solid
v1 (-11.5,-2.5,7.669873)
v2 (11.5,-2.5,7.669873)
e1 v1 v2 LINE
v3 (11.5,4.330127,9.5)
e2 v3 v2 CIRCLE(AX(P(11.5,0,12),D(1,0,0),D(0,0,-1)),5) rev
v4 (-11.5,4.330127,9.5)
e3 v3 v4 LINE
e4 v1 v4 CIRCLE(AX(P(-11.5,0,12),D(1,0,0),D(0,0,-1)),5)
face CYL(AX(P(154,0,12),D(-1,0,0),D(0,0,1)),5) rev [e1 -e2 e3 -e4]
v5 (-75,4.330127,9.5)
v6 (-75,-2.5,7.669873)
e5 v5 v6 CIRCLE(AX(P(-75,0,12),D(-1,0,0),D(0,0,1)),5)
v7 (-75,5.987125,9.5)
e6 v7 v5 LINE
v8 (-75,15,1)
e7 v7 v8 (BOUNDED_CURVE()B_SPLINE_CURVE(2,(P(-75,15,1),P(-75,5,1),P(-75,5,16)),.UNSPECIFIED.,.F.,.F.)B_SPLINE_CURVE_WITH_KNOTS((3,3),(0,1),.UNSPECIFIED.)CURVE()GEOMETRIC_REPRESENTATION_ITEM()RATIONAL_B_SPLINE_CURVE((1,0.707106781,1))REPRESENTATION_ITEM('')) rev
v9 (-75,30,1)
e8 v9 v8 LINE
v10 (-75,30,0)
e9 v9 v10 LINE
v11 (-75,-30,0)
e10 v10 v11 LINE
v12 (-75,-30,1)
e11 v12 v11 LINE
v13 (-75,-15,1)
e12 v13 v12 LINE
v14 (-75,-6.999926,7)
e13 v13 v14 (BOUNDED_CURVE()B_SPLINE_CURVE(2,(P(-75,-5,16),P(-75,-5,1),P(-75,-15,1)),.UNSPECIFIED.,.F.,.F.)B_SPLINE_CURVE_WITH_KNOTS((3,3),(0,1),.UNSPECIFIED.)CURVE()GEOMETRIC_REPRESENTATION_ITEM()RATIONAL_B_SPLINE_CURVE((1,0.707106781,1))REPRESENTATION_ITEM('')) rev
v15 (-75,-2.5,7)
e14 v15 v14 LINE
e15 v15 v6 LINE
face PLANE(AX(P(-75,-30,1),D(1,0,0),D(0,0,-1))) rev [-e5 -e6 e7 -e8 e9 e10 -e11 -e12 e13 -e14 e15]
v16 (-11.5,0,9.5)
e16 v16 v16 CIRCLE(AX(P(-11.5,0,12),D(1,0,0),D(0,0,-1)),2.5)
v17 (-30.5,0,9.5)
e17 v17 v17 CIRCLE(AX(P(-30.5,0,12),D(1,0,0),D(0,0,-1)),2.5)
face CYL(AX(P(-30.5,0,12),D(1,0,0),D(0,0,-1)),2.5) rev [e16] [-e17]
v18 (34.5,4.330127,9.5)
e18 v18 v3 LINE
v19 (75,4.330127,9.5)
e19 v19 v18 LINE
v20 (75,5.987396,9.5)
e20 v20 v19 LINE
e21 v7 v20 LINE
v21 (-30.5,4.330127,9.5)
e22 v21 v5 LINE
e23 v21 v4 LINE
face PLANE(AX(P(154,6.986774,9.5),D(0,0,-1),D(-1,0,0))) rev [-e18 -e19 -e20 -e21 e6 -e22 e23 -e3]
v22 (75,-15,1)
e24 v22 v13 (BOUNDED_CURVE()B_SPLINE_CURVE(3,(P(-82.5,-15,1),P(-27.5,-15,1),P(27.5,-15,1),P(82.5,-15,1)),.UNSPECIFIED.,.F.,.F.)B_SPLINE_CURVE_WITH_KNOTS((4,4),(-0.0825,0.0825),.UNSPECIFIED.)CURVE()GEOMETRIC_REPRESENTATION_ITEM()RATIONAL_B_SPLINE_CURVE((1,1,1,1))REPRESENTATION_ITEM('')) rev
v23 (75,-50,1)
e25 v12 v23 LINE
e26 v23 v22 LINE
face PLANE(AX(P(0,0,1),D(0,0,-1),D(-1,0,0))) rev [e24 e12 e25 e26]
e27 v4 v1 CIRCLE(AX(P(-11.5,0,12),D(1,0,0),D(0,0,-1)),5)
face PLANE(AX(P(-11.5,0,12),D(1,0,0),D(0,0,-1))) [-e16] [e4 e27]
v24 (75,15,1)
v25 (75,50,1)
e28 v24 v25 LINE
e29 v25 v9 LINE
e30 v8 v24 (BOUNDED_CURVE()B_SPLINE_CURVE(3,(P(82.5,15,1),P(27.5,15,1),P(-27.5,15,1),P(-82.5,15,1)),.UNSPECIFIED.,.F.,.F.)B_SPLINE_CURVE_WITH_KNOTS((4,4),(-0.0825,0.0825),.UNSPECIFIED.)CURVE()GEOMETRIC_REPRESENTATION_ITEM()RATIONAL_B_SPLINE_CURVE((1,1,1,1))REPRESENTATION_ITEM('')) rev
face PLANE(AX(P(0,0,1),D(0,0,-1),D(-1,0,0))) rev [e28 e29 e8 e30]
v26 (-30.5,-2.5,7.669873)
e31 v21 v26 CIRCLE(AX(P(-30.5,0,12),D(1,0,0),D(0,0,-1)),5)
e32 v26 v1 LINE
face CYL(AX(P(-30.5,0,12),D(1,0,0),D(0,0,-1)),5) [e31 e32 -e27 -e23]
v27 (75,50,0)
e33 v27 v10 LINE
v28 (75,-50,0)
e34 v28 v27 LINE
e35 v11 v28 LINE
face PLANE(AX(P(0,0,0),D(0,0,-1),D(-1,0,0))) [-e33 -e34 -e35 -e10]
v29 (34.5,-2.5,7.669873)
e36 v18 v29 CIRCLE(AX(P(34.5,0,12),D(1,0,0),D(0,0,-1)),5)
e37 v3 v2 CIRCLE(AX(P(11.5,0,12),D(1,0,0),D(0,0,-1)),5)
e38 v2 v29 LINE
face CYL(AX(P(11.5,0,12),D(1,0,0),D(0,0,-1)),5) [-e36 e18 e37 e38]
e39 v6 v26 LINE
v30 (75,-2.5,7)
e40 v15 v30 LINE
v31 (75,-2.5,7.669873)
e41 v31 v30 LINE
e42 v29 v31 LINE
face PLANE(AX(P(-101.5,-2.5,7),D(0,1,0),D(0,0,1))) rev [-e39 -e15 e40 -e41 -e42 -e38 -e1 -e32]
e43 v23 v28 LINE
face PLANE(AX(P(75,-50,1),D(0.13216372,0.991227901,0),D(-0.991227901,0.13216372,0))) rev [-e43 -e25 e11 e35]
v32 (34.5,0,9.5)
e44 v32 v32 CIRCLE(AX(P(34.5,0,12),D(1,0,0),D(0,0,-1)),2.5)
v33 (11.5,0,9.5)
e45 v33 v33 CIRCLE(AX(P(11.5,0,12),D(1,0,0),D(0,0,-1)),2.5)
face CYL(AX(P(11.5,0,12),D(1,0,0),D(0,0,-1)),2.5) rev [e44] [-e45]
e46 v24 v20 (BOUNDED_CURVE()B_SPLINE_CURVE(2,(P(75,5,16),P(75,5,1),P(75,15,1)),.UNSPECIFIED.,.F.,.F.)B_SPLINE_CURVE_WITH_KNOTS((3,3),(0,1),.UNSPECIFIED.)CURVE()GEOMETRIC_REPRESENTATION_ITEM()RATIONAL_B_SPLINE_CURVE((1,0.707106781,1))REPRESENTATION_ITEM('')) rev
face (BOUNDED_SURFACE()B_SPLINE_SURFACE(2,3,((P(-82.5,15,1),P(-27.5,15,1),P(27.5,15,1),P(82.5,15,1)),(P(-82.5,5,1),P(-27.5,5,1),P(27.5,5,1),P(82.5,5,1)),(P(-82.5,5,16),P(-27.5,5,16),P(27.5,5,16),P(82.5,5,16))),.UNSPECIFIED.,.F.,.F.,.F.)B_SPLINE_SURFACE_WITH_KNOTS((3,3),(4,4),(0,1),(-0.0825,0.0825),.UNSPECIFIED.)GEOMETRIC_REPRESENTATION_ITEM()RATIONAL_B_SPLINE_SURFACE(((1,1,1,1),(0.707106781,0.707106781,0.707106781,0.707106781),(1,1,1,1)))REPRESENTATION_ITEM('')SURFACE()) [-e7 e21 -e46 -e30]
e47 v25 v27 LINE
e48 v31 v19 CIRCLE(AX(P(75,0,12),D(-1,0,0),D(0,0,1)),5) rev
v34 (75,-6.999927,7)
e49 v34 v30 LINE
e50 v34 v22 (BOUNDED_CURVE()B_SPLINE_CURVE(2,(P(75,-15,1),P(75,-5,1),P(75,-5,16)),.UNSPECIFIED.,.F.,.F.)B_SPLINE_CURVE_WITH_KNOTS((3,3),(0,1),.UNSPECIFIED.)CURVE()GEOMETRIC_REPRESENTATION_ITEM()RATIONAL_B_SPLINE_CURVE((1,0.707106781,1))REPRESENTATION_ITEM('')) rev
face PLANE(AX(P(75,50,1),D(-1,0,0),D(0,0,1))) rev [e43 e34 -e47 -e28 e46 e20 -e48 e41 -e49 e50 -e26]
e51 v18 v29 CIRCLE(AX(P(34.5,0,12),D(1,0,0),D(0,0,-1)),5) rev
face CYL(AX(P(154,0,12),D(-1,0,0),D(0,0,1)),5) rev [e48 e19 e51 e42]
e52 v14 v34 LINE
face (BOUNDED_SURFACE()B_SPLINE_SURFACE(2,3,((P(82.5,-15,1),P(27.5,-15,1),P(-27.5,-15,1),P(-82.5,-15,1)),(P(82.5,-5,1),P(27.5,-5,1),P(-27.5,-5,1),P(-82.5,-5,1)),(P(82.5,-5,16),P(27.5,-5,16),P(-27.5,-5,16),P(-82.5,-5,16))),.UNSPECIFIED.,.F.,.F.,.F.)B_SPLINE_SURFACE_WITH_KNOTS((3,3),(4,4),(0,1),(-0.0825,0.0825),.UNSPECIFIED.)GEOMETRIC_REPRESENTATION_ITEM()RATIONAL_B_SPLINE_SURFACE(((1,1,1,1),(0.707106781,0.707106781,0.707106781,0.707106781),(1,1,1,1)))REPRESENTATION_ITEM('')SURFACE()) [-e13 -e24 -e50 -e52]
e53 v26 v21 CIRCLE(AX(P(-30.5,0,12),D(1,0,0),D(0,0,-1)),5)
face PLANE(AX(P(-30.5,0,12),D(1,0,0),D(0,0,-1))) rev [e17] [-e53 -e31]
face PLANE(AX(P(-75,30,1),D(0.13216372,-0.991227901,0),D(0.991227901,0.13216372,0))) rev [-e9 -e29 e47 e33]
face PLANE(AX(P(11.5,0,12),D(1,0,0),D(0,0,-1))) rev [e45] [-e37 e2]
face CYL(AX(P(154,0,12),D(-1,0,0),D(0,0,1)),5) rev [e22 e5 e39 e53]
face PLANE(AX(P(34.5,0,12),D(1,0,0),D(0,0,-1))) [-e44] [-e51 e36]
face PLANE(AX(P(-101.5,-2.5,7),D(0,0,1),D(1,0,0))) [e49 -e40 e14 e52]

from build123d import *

# Parameters (mm, degrees)
BOSS_EXTRUDE1_DEPTH      = 1
BOSS_EXTRUDE5_DEPTH      = 100
BOSS_EXTRUDE5_DEPTH_BACK = 1
SKETCH2_W                = 214
SKETCH2_H                = 10
FILLET3_SIZE             = 15
FILLET3_SIZE_2           = 10
CUT_EXTRUDE2_DEPTH       = 229
SKETCH7_W                = 64
SKETCH7_H                = 10
CUT_EXTRUDE3_DEPTH       = 14
EXTRUDE_THIN2_START      = -40.5
SKETCH9_R                = 5
SKETCH9_R_2              = 2.5
EXTRUDE_THIN2_DEPTH      = 23
EXTRUDE_THIN3_START      = -86.5
SKETCH9_3_R              = 5
SKETCH9_3_R_2            = 2.5
EXTRUDE_THIN3_DEPTH      = 19
CUT_EXTRUDE8_DEPTH       = 71
CUT_EXTRUDE8_DEPTH_BACK  = 153


with BuildPart() as part:
    # Sketch1 → Boss-Extrude1 (new body)
    with BuildSketch(Plane.XY):
        Polygon((75, 50), (75, -50), (-75, -30), (-75, 30), align=None)
    extrude(amount=BOSS_EXTRUDE1_DEPTH)

    # Sketch2 → Boss-Extrude5 (add, two sides: drawn at the far end of the back side and taken through both)
    with BuildSketch(Plane.XY.offset(1).offset(-BOSS_EXTRUDE5_DEPTH_BACK)):
        with Locations((32, 0)):
            Rectangle(SKETCH2_W, SKETCH2_H)
    extrude(amount=BOSS_EXTRUDE5_DEPTH + BOSS_EXTRUDE5_DEPTH_BACK)

    # Fillet3
    # an asymmetric fillet: 15, 10 mm, written as the material it adds along each edge
    with BuildSketch(Plane(origin=(75, -5, 1), x_dir=(0, 0, 1), z_dir=(-1, 0, 0))) as fillet3_piece_1:
        with BuildLine():
            Bezier((FILLET3_SIZE, 0), (0, 0), (0, -FILLET3_SIZE_2), weights=[1, 0.707106781, 1])
            Line((0, -FILLET3_SIZE_2), (0, 0))
            Line((0, 0), (FILLET3_SIZE, 0))
        make_face()
    extrude(amount=150)
    with BuildSketch(Plane(origin=(-75, 5, 1), x_dir=(0, 1, 0), z_dir=(1, 0, 0))) as fillet3_piece_2:
        with BuildLine():
            Bezier((FILLET3_SIZE_2, 0), (0, 0), (0, FILLET3_SIZE), weights=[1, 0.707106781, 1])
            Line((0, FILLET3_SIZE), (0, 0))
            Line((0, 0), (FILLET3_SIZE_2, 0))
        make_face()
    extrude(amount=150)

    # Sketch6 → Cut-Extrude2 (cut)
    with BuildSketch(Plane.ZY.offset(75)):
        with BuildLine():
            Line((9.5, 6.986773712), (9.5, 4.330127019))
            ThreePointArc((9.5, 4.330127019), (7, 0), (9.5, -4.330127019))
            Line((9.5, -4.330127019), (9.5, -7.297871365))
            Line((9.5, -7.297871365), (14.5, -7.297871365))
            Line((14.5, -7.297871365), (14.5, -4.330127019))
            ThreePointArc((14.5, -4.330127019), (17, 0), (14.5, 4.330127019))
            Line((14.5, 4.330127019), (14.5, 6.986773712))
            Line((14.5, 6.986773712), (9.5, 6.986773712))
        make_face()
    extrude(amount=-CUT_EXTRUDE2_DEPTH, mode=Mode.SUBTRACT)


with BuildPart() as cut_extrude2_piece_1:
    # of the separate pieces the step leaves, piece 1, a body of its own (cut_extrude2_pieces)
    add(part.part.solids().sort_by_distance((-75, 5.050125629, 14.5))[0])


with BuildPart() as cut_extrude2_piece_2:
    # of the separate pieces the step leaves, piece 2, a body of its own (cut_extrude2_pieces)
    add(part.part.solids().sort_by_distance((-75, 15, 1))[0])

    # Sketch7 → Cut-Extrude3 (cut)
    with BuildSketch(Plane(origin=(0, 0, 0), x_dir=(-1, 0, 0), z_dir=(0, 0, -1))):
        with Locations((-107, 0)):
            Rectangle(SKETCH7_W, SKETCH7_H)
    extrude(amount=-CUT_EXTRUDE3_DEPTH, mode=Mode.SUBTRACT)

    # Sketch9 → Extrude-Thin2 (add)
    with BuildSketch(Plane(origin=(75, 0, 0), x_dir=(0, 0, -1), z_dir=(1, 0, 0)).offset(EXTRUDE_THIN2_START)):
        with Locations((-12, 0)):
            Circle(SKETCH9_R)
        with Locations((-12, 0)):
            Circle(SKETCH9_R_2, mode=Mode.SUBTRACT)
    extrude(amount=-EXTRUDE_THIN2_DEPTH)

    # Sketch9<3> → Extrude-Thin3 (add)
    with BuildSketch(Plane(origin=(75, 0, 0), x_dir=(0, 0, -1), z_dir=(1, 0, 0)).offset(EXTRUDE_THIN3_START)):
        with Locations((-12, 0)):
            Circle(SKETCH9_3_R)
        with Locations((-12, 0)):
            Circle(SKETCH9_3_R_2, mode=Mode.SUBTRACT)
    extrude(amount=-EXTRUDE_THIN3_DEPTH)

    # Sketch12 → Cut-Extrude8 (cut, two sides: drawn at the far end of the back side and taken through both)
    with BuildSketch(Plane.ZY.offset(30.5).offset(-CUT_EXTRUDE8_DEPTH_BACK)):
        with BuildLine():
            Line((7, -2.5), (7.669872981, -2.5))
            ThreePointArc((7.669872981, -2.5), (8.464466094, -3.535533906), (9.5, -4.330127019))
            Line((9.5, -4.330127019), (9.5, -7.690384485))
            Line((9.5, -7.690384485), (7, -7.690384485))
            Line((7, -7.690384485), (7, -2.5))
        make_face()
    extrude(amount=CUT_EXTRUDE8_DEPTH + CUT_EXTRUDE8_DEPTH_BACK, mode=Mode.SUBTRACT)


solid = cut_extrude2_piece_2.part
